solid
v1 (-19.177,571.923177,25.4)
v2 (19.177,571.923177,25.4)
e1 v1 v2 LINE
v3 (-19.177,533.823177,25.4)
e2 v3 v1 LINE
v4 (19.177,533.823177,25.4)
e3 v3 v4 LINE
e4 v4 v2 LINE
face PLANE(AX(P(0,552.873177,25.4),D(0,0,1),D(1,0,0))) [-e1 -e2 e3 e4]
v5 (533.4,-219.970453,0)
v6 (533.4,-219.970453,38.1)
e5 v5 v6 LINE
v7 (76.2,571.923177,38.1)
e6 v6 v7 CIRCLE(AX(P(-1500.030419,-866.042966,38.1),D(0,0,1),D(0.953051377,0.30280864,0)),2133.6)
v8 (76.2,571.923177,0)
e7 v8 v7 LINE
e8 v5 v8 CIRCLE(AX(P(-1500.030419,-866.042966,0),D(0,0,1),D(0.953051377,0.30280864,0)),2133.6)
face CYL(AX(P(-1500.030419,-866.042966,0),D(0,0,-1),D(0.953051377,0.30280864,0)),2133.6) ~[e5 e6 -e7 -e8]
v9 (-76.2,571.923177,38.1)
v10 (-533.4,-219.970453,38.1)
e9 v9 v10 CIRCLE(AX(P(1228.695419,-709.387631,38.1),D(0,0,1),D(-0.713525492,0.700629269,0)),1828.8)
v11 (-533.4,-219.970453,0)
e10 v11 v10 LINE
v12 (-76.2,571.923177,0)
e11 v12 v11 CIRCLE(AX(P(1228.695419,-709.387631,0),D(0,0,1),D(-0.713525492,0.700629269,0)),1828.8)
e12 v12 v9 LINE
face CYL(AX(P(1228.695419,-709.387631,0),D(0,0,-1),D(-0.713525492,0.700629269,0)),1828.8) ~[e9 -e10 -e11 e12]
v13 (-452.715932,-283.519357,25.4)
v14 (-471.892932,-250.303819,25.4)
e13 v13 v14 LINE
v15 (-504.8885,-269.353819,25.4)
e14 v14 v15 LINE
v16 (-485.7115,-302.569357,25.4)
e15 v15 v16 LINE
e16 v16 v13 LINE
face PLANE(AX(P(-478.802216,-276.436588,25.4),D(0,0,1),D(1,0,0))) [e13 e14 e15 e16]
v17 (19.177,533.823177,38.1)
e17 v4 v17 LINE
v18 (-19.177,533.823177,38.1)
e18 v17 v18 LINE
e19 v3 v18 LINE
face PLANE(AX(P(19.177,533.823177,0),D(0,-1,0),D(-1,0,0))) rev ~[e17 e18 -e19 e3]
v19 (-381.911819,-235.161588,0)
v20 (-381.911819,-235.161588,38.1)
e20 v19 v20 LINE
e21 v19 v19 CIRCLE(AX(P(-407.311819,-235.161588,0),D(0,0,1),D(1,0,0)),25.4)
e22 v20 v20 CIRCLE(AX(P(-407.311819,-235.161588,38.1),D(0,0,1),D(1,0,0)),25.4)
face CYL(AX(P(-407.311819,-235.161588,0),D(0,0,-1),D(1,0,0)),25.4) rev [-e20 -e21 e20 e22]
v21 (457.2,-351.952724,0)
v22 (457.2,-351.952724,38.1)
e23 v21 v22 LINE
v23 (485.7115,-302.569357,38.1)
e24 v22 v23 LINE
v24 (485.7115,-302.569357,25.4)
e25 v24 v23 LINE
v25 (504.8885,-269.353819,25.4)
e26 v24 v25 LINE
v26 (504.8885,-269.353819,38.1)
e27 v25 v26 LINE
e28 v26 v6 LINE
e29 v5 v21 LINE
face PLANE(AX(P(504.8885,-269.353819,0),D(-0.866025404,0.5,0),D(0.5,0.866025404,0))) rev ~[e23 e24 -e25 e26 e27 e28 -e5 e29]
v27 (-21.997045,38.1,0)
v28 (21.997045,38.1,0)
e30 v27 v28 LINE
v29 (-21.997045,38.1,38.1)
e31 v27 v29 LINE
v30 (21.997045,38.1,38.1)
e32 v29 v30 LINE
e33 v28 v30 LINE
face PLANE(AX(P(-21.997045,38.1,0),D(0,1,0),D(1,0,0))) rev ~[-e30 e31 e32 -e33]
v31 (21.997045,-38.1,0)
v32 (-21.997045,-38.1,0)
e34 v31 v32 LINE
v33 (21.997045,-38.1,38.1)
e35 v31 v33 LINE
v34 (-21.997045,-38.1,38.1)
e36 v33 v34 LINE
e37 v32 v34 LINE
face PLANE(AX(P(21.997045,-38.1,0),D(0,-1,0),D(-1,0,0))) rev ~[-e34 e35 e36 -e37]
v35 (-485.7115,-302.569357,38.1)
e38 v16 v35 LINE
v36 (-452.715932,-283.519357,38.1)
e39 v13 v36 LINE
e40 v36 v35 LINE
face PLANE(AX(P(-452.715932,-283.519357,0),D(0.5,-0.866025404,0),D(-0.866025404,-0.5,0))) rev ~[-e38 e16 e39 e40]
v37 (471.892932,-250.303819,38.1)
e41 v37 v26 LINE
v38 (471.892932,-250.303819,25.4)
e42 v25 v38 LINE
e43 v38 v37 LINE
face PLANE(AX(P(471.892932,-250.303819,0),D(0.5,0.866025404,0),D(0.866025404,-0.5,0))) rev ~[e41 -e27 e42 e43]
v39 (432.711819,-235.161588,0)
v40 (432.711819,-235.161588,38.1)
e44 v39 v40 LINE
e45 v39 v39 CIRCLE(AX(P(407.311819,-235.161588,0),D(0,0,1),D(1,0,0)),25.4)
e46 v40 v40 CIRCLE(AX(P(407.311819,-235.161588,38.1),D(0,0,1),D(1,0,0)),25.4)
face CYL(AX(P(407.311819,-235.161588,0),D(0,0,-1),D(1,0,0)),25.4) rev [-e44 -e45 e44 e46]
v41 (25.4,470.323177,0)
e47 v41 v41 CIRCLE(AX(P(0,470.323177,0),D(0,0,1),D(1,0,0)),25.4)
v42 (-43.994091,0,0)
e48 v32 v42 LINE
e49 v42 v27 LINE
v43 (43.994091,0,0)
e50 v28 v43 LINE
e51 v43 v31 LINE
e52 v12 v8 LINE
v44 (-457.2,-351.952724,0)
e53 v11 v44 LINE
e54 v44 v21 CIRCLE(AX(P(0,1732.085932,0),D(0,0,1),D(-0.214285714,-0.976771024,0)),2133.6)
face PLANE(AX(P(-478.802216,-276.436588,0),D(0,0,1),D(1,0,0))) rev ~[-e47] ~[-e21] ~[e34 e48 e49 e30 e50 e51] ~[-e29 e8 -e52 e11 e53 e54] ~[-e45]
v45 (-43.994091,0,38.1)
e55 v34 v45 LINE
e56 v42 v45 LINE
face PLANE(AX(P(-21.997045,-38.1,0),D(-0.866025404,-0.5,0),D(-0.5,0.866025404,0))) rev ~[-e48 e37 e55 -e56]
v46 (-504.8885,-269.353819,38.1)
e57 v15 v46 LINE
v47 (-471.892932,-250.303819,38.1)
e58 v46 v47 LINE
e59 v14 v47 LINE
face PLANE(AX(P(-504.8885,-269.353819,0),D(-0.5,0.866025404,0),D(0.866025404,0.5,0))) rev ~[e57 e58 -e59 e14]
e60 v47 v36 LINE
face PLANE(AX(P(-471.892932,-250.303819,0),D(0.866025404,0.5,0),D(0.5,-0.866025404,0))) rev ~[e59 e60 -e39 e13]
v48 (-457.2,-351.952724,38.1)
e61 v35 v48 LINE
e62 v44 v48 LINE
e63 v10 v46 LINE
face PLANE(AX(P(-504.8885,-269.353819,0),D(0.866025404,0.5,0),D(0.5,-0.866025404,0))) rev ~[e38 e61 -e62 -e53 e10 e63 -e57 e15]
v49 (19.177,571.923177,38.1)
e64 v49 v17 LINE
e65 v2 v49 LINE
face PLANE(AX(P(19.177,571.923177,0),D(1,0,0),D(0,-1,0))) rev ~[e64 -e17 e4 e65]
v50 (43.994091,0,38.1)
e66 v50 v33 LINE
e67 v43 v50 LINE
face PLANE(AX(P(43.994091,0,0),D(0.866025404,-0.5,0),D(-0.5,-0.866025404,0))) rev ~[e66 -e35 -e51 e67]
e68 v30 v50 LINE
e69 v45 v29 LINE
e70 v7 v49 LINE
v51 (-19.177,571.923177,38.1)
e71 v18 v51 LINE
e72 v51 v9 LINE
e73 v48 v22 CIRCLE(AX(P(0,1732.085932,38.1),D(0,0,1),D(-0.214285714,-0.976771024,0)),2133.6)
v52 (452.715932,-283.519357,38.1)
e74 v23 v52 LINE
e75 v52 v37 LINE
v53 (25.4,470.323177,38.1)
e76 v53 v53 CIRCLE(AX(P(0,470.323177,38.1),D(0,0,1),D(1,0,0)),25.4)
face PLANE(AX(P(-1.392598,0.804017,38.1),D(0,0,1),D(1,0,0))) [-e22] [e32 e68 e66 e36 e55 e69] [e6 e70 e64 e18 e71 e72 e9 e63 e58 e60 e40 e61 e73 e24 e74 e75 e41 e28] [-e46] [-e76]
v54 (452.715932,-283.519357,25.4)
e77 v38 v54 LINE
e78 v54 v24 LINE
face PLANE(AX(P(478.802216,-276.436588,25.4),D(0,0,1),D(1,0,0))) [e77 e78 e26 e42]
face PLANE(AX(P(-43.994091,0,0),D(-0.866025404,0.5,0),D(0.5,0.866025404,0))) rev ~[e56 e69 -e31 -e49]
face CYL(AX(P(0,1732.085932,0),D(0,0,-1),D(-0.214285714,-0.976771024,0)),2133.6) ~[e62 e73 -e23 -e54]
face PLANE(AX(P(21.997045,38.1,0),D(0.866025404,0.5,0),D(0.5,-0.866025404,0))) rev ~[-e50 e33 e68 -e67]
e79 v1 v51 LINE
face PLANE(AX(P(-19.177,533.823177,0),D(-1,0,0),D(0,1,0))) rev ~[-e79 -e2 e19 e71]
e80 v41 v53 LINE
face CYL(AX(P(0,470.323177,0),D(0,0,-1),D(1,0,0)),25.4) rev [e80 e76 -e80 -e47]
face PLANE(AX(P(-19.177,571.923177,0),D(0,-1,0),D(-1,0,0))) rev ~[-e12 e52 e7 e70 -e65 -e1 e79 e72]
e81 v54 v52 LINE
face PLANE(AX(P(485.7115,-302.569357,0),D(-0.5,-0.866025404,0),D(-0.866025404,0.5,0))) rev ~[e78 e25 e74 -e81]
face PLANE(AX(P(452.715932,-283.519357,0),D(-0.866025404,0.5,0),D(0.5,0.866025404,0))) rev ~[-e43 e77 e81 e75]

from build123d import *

# Parameters (mm, degrees)
F0_R     = 25.4
F2_DEPTH = 38.1
F0_W     = 38.354
F0_H     = 38.1
F3_DEPTH = 25.4


# Not quite as in the source:
# - a variable given as a bare number and used for a length is read in inches; the dataset says mm whatever the document's units were


with BuildPart() as f2:
    # F0 (on Top) → F2 (new body)
    with BuildSketch(Plane.XY):
        with BuildLine():
            ThreePointArc((-76.2, 571.9231766592), (-355.0918394716, 205.012369106), (-533.4, -219.9704525612))
            Line((-533.4, -219.9704525612), (-504.8885, -269.3538191612))
            Line((-504.8885, -269.3538191612), (-471.8929321158, -250.3038191612))
            Line((-471.8929321158, -250.3038191612), (-452.7159321158, -283.519357498))
            Line((-452.7159321158, -283.519357498), (-485.7115, -302.569357498))
            Line((-485.7115, -302.569357498), (-457.2, -351.952724098))
            ThreePointArc((-457.2, -351.952724098), (0, -401.5140680266), (457.2, -351.952724098))
            Line((457.2, -351.952724098), (485.7115, -302.569357498))
            Line((485.7115, -302.569357498), (452.7159321158, -283.519357498))
            Line((452.7159321158, -283.519357498), (471.8929321158, -250.3038191612))
            Line((471.8929321158, -250.3038191612), (504.8885, -269.3538191612))
            Line((504.8885, -269.3538191612), (533.4, -219.9704525612))
            ThreePointArc((533.4, -219.9704525612), (347.7213828878, 200.7570340133), (76.2, 571.9231766592))
            Line((76.2, 571.9231766592), (19.177, 571.9231766592))
            Line((19.177, 571.9231766592), (19.177, 533.8231766592))
            Line((19.177, 533.8231766592), (-19.177, 533.8231766592))
            Line((-19.177, 533.8231766592), (-19.177, 571.9231766592))
            Line((-19.177, 571.9231766592), (-76.2, 571.9231766592))
        make_face()
        with Locations((-407.3118189755, -235.1615883296)):
            Circle(F0_R, mode=Mode.SUBTRACT)
        Polygon((-21.9970452561, 38.1), (21.9970452561, 38.1), (43.9940905122, 0), (21.9970452561, -38.1), (-21.9970452561, -38.1), (-43.9940905122, 0), align=None, mode=Mode.SUBTRACT)
        with Locations((407.3118189755, -235.1615883296)):
            Circle(F0_R, mode=Mode.SUBTRACT)
        with Locations((0, 470.3231766592)):
            Circle(F0_R, mode=Mode.SUBTRACT)
    extrude(amount=F2_DEPTH)

    # F0 (on Top) → F3 (join)
    with BuildSketch(Plane.XY):
        Polygon((-471.8929321158, -250.3038191612), (-504.8885, -269.3538191612), (-485.7115, -302.569357498), (-452.7159321158, -283.519357498), align=None)
        Polygon((452.7159321158, -283.519357498), (485.7115, -302.569357498), (504.8885, -269.3538191612), (471.8929321158, -250.3038191612), align=None)
        with Locations((0, 552.8731766592)):
            Rectangle(F0_W, F0_H)
    extrude(amount=F3_DEPTH)


solid = f2.part
